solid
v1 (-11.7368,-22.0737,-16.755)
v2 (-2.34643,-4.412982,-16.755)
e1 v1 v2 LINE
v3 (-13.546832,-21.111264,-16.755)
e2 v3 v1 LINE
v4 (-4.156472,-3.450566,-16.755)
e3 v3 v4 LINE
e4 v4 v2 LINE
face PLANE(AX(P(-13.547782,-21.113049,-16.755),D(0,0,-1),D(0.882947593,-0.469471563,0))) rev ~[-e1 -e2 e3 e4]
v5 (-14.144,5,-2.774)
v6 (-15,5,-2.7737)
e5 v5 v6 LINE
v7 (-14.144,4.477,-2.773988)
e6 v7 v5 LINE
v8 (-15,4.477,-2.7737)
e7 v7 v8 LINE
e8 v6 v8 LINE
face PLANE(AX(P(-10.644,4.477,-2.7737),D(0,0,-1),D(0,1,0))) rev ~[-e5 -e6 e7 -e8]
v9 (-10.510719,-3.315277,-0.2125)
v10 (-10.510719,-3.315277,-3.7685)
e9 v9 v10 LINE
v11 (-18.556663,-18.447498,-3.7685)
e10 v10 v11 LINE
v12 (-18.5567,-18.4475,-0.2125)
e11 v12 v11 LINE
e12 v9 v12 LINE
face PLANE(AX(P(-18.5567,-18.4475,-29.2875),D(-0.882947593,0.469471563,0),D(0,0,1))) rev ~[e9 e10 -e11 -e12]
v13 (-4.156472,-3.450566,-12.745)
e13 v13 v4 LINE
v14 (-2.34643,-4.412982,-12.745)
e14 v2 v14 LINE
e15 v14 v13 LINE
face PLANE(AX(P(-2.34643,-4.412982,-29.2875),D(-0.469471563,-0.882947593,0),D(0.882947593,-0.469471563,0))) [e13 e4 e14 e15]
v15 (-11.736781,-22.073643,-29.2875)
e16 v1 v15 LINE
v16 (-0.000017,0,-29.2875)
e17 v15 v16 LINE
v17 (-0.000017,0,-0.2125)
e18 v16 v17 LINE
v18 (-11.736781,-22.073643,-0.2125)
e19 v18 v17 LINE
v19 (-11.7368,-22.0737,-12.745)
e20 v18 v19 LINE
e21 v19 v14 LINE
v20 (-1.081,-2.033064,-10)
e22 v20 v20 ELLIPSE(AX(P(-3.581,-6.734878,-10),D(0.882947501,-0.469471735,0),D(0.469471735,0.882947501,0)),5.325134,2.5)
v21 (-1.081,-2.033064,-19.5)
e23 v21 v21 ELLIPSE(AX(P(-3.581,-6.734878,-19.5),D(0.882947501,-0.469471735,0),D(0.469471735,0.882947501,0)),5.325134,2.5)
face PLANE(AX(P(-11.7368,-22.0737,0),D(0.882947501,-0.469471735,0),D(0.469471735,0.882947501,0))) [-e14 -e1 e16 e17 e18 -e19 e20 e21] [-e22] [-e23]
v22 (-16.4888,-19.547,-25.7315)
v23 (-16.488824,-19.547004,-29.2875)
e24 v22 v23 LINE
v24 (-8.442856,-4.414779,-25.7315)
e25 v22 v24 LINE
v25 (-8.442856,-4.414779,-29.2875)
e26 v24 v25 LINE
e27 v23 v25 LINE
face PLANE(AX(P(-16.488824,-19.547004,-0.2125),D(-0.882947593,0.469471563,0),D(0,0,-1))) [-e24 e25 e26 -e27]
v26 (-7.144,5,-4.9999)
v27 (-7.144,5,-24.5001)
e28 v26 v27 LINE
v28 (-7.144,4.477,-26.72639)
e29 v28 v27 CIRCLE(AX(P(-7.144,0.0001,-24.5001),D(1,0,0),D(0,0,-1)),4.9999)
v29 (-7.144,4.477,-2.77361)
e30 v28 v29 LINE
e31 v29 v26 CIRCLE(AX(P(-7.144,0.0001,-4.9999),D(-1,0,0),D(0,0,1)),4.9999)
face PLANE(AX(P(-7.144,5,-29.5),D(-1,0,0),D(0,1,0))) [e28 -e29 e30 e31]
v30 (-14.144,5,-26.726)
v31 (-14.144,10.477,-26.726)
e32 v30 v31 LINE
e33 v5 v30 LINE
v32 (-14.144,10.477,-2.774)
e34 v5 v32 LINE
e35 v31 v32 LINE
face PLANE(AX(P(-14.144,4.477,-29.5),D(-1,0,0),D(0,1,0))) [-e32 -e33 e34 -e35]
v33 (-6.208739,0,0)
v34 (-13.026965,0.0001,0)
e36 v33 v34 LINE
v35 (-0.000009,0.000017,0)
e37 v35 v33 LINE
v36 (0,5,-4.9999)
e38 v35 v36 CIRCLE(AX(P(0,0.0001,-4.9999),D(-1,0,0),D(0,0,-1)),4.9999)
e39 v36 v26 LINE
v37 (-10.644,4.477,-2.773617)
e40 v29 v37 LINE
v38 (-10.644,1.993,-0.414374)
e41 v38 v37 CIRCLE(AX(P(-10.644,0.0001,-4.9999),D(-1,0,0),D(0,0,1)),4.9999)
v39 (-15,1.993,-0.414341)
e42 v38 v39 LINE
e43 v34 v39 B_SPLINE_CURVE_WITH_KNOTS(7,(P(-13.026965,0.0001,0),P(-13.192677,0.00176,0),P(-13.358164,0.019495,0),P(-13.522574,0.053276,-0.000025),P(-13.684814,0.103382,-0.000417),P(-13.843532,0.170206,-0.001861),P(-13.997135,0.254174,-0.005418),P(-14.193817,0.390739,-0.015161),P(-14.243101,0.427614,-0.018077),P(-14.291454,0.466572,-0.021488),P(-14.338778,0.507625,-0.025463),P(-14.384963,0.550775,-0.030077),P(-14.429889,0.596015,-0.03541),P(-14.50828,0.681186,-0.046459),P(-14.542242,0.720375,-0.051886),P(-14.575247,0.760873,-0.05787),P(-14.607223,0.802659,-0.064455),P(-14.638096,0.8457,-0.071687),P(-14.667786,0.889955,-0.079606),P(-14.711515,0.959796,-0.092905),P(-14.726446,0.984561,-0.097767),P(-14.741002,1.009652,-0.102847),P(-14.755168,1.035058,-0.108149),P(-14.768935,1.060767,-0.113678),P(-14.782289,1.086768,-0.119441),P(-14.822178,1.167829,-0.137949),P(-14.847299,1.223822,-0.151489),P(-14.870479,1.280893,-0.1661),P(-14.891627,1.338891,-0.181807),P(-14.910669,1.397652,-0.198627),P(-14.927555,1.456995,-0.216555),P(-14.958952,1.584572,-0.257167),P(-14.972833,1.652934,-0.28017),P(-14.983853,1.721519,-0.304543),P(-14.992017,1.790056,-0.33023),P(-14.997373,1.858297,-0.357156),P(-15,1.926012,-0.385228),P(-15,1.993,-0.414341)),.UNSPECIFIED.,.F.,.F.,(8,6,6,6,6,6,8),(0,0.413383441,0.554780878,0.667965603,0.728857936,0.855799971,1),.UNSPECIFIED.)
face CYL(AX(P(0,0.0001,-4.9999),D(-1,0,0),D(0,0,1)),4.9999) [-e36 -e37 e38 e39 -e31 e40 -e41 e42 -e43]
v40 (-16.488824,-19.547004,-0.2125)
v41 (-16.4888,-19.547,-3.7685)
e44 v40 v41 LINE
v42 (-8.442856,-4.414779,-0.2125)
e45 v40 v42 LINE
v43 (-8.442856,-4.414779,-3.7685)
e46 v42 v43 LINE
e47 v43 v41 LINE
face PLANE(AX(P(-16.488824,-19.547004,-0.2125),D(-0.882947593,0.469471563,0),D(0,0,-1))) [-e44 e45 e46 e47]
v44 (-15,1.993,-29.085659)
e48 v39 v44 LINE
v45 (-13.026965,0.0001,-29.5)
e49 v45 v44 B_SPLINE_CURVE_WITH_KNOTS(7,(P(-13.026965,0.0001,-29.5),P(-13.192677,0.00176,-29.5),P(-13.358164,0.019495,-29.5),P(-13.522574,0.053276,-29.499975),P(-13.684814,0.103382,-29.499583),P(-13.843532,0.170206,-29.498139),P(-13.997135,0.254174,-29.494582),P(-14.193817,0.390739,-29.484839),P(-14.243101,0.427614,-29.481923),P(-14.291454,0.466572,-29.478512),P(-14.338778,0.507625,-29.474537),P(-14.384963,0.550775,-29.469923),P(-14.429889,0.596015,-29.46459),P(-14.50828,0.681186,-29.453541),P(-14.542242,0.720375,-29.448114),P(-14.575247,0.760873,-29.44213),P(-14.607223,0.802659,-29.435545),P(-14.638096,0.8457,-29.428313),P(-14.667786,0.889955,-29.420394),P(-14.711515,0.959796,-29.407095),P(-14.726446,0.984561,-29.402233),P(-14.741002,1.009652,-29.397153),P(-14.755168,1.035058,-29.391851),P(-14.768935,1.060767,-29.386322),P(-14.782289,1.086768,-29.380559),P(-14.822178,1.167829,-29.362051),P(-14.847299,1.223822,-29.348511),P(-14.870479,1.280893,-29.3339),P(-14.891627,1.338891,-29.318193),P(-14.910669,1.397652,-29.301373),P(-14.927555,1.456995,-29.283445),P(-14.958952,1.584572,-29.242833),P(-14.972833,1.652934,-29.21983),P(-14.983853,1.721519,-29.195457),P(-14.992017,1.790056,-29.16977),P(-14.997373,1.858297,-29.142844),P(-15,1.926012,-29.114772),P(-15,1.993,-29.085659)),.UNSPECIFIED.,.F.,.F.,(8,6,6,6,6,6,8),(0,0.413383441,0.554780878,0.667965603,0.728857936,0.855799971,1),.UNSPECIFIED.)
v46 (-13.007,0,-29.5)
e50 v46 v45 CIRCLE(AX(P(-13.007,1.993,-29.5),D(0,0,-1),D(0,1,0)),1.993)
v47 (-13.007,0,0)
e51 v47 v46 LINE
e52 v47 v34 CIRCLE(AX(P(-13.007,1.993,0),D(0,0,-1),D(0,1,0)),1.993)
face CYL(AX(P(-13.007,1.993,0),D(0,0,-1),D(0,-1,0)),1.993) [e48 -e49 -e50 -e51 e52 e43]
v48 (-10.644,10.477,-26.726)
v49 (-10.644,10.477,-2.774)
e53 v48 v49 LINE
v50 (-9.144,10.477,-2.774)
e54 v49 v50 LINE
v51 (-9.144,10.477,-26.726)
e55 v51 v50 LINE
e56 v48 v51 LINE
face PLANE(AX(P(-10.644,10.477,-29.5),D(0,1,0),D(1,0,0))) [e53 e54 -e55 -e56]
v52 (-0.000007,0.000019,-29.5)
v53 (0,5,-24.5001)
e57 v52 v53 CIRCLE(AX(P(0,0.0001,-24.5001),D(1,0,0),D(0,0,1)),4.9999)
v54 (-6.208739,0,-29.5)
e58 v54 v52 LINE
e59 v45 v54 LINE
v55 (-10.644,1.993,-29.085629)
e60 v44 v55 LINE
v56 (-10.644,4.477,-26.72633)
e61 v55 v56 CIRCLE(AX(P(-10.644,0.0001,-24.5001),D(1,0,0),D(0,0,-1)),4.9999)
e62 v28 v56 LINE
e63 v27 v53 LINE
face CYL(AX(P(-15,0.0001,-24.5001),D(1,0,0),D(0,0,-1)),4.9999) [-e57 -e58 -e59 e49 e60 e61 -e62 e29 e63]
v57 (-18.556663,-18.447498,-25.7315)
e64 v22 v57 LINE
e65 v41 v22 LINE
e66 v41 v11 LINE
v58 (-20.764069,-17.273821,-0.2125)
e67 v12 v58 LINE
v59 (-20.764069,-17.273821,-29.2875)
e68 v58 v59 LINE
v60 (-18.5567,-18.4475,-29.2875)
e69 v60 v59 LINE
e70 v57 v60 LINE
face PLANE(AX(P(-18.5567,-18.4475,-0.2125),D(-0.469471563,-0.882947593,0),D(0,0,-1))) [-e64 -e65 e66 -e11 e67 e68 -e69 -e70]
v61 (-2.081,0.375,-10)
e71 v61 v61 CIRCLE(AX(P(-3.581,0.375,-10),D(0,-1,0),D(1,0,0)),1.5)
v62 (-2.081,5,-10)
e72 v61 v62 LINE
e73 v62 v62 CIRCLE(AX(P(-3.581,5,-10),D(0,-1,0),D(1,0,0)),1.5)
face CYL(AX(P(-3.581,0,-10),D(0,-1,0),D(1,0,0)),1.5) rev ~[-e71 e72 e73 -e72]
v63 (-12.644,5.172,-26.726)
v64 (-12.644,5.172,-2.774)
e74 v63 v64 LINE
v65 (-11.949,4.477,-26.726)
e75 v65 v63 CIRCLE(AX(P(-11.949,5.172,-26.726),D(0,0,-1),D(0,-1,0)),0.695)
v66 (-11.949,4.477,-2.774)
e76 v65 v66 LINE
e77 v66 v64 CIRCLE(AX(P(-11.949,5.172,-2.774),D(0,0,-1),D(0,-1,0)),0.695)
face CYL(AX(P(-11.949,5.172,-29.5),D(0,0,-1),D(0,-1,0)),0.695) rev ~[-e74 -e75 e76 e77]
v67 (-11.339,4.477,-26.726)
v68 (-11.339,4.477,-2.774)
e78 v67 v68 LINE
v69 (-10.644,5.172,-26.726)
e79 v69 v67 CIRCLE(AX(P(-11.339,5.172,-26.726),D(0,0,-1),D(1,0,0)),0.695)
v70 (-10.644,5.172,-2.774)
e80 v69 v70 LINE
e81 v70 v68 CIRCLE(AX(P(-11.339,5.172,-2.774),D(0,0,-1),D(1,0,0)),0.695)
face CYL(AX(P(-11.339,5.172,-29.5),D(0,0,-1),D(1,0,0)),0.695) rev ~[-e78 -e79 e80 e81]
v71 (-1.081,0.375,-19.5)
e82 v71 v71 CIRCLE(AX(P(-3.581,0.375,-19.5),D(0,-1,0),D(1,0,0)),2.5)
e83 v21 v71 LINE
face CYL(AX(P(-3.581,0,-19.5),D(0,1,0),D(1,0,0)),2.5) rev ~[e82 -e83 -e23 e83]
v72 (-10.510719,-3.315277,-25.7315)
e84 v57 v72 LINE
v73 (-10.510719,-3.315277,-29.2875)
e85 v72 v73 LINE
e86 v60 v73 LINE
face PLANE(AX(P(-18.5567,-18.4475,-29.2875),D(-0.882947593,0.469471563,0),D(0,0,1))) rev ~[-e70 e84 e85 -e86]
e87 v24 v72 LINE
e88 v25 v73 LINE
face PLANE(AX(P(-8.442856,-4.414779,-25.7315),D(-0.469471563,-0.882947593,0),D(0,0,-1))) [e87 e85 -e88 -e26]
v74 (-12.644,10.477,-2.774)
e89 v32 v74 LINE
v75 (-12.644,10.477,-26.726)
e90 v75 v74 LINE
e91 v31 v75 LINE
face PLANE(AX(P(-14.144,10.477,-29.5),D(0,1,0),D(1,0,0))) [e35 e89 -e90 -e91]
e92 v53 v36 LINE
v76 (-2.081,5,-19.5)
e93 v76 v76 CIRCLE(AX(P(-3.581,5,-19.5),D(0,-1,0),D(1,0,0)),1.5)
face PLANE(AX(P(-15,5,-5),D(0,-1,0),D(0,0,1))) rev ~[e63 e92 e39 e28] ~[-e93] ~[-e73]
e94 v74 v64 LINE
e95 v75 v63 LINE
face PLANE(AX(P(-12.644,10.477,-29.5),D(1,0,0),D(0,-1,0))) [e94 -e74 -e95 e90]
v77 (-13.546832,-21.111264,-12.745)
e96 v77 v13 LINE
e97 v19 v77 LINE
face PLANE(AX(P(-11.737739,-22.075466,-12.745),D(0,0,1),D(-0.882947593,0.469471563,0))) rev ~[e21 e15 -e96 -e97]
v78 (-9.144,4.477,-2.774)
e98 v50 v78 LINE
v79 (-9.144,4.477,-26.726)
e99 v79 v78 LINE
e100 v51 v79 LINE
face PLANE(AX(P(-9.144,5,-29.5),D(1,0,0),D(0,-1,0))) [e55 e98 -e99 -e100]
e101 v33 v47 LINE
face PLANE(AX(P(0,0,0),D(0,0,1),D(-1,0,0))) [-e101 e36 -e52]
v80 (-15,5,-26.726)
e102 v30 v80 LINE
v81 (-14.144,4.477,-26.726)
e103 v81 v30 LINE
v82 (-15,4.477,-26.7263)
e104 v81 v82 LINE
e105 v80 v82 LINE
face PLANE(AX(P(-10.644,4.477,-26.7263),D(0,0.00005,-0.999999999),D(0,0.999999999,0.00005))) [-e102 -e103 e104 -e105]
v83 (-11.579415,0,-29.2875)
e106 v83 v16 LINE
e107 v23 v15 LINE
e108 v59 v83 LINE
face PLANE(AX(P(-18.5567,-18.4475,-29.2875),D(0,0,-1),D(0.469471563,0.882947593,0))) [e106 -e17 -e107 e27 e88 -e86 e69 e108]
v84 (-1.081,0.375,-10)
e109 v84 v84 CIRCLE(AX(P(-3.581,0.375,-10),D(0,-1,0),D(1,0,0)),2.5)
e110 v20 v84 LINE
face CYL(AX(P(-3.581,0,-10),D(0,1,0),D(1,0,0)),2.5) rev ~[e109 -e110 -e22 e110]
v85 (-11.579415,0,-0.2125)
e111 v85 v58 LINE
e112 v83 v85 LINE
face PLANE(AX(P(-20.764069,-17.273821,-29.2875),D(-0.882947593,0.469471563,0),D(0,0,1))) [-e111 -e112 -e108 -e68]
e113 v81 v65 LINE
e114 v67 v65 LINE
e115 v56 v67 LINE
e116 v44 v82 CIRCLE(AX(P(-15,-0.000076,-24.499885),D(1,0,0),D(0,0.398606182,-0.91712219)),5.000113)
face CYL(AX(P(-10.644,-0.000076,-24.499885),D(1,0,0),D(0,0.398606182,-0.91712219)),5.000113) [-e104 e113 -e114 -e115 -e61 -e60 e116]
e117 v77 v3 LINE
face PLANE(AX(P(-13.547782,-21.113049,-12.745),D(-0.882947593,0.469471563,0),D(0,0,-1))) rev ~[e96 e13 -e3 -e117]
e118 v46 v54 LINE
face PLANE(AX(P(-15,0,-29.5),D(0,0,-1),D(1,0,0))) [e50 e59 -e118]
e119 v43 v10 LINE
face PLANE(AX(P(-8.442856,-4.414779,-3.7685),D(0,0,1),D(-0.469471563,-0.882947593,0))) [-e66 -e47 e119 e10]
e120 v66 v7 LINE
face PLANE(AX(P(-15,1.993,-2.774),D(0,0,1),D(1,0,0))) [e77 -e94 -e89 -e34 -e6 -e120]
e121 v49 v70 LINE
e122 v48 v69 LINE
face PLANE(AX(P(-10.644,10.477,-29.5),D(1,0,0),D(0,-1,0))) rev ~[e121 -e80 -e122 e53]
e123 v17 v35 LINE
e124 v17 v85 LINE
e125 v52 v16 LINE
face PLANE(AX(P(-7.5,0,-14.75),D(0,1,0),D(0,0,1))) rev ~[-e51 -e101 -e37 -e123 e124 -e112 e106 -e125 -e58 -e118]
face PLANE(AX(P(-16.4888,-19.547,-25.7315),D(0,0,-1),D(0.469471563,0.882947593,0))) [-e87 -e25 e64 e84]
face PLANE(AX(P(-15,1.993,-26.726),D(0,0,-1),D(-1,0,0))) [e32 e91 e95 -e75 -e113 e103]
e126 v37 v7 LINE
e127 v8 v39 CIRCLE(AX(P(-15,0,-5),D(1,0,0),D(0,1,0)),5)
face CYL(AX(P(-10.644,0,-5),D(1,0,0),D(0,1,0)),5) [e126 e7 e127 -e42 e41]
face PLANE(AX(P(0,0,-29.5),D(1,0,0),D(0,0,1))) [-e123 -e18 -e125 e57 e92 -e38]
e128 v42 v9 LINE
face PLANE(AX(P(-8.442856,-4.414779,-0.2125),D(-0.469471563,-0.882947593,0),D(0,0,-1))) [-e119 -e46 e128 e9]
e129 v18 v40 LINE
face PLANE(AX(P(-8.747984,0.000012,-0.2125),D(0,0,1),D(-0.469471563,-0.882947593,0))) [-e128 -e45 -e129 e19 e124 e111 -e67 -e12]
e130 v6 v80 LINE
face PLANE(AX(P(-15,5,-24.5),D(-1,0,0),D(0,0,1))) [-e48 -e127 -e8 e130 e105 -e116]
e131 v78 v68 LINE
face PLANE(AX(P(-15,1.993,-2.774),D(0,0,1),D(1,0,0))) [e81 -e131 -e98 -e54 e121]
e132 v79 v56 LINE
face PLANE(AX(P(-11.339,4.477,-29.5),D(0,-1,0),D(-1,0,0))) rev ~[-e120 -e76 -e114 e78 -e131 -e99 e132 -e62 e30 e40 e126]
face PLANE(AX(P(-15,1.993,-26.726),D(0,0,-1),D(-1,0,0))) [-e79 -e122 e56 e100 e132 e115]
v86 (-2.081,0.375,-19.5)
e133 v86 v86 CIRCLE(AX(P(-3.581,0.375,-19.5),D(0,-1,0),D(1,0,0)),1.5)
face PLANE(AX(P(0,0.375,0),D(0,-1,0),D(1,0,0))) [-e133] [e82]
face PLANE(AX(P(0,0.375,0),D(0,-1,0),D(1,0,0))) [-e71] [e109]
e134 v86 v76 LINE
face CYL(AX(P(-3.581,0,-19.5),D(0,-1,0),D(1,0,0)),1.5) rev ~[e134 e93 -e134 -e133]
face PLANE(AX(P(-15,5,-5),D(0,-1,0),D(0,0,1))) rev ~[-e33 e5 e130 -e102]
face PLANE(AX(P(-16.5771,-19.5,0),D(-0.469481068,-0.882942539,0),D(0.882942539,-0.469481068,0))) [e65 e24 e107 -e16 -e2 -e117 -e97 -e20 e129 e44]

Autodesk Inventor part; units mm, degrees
ref_plane "YZ Plane" through (0, 0, 0) normal (1, 0, 0) x (0, 1, 0)
ref_plane "XZ Plane" through (0, 0, 0) normal (0, 1, 0) x (-1, 0, 0)
sketch "Sketch1" plane through (0, 0, 0) normal (0, 1, 0) x (-1, 0, 0)
  line L0 (0, 0) -> (15, 0)
  line L1 (15, 0) -> (15, -29.5)
  line L2 (15, -29.5) -> (0, -29.5)
  line L3 (0, -29.5) -> (0, 0)
  dimension "d0" = 15
  dimension "d1" = 29.5
extrude "Extrusion1" add sketch "Sketch1" along normal blind 5
fillet "Fillet1" radius 5 2 edges at (-7.5, 5, 0) (-7.5, 5, -29.5)
sketch "Sketch2" plane through (0, 0, 0) normal (0, -1, 0) x (1, 0, 0)
  circle A0 centre (-3.581, -10) radius 1.5
  line L0 (-15, -29.5) -> (-15, 0) projected
  line L1 (-15, -14.75) -> (-4.074, -14.75)
  line L2 (-4.074, 0) -> (-4.074, -29.5) projected
  circle A1 centre (-3.581, -19.5) radius 1.5
  line L3 (0, -27.3987) -> (0, -2.1013) projected
  point P0 (0, 0)
  dimension "d6" = 3
  dimension "d7" = 4.75
  dimension "d8" = 10.926
  dimension "d10" = 3
  dimension "d11" = 4.75
  dimension "d15" = 3.581
  dimension "d16" = 3.581
extrude "Extrusion2" cut sketch "Sketch2" against normal up to surface (5 mm away)
fillet "Fillet3" radius 1.993 1 edges at (-15, 0, -14.75)
sketch "Sketch3" plane through (0, 0, 0) normal (0, -1, 0) x (1, 0, 0)
  circle A0 centre (-3.581, -10) radius 2.5
  circle A1 centre (-3.581, -19.5) radius 2.5
  circle A2 centre (-3.581, -10) radius 1.5 projected
  circle A3 centre (-3.581, -19.5) radius 1.5 projected
  point P0 (0, 0)
  dimension "d18" = 5
  dimension "d19" = 5
  dimension "d20" = 0
  dimension "d21" = 0
  dimension "d22" = 0
  dimension "d23" = 0
extrude "Extrusion3" cut sketch "Sketch3" along normal blind 32.5 and the other way blind 0.375
sketch "Sketch4" plane through (-15, 5, -24.5) normal (-1, 0, 0) x (0, 0, 1)
  line L0 (24.5, -3.007) -> (-5, -3.007)
  line L1 (-5, -3.007) -> (-5, 0)
  line L2 (-5, 0) -> (24.5, 0)
  line L3 (24.5, 0) -> (24.5, -3.007)
  line L4 (-5, -5) -> (24.5, -5) projected
  line L5 (0, 0) -> (19.5, 0) projected
  dimension "d26" = 1.993
  dimension "d27" = 0
  dimension "d28" = 0
  dimension "d29" = 0
extrude "Extrusion4" add sketch "Sketch4" against normal blind 4.356
sketch "Sketch6" plane through (-15, 1.993, -29.5) normal (0, 0, -1) x (-1, 0, 0)
  line L0 (-3.661, 2.484) -> (-3.051, 2.484)
  line L1 (-0.856, 2.484) -> (-0.856, 8.484)
  line L2 (-0.856, 8.484) -> (-5.856, 8.484)
  line L3 (-5.856, 8.484) -> (-5.856, 2.484)
  line L4 (-15, -1.993) -> (-1.993, -1.993) projected
  line L5 (0, 3.007) -> (0, 0) projected
  line L6 (-15, -1.993) -> (-15, 3.007) projected
  line L7 (-4.356, 8.484) -> (-4.356, 3.179)
  line L8 (-2.356, 8.484) -> (-2.356, 3.179)
  arc A0 (-4.356, 3.179) -> (-3.661, 2.484) centre (-3.661, 3.179) ccw
  arc A1 (-3.051, 2.484) -> (-2.356, 3.179) centre (-3.051, 3.179) ccw
  line L9 (-0.856, 2.484) -> (-3.051, 2.484)
  line L10 (-5.856, 2.484) -> (-3.661, 2.484)
  line L11 (-5.856, 2.484) -> (-7.856, 2.484)
  line L12 (-15, 3.007) -> (-4.356, 3.007) projected
  line L13 (-5.856, 2.484) -> (-3.856, 2.484) construction
  line L14 (-7.856, 2.484) -> (-7.856, 8.484)
  line L15 (-7.856, 3.3104) -> (-5.856, 3.3104)
  point P0 (-10.926, -1.993)
  point P1 (-4.356, -1.993)
  dimension "d37" = 4.477
  dimension "d38" = 0.856
  dimension "d39" = 10.477
  dimension "d40" = 9.144
  dimension "d41" = 1.5
  dimension "d42" = 1.5
  dimension "d43" = 2
  dimension "d44" = 0.695
  dimension "d45" = 2
  dimension "d46" = 180
extrude "Extrusion6" cut sketch "Sketch6" against normal up to surface (29.5 mm away)
extrude "Extrusion7" add sketch "Sketch6" against normal up to surface (29.5 mm away) contours L10 L3 L2 L7 A0 | A1 L8 L2 L1 L9
extrude "Extrusion8" cut sketch "Sketch6" against normal blind 2.774 contours L10 L3 L2 L7 A0 | A1 L8 L2 L1 L9
sketch "Sketch7" plane through (-15, 1.993, 0) normal (0, 0, 1) x (1, 0, 0)
  line L0 (5.856, 8.484) -> (5.856, 2.484) projected
  line L1 (5.856, 2.484) -> (0.856, 2.484)
  line L2 (0.856, 2.484) -> (0.856, 11.6469)
  line L3 (0.856, 11.6469) -> (5.856, 11.6469)
  line L4 (5.856, 11.6469) -> (5.856, 2.484)
  line L5 (0.856, 3.007) -> (0.856, 8.484) projected
  point P0 (15, -1.993)
  dimension "d53" = 0
extrude "Extrusion9" cut sketch "Sketch7" against normal blind 2.774
sketch "Sketch8" plane through (-10.644, 5, -24.5) normal (1, 0, 0) x (0, 0, -1)
  arc A0 (4.5856, -3.007) -> (2.2263, -0.523) centre (0, -5) ccw projected
  arc A1 (4.5856, -3.007) -> (2.2263, -0.523) centre (0, -5) ccw
  line L0 (4.5856, -3.007) -> (5, -3.007) projected
  line L1 (4.5856, -3.007) -> (5, -3.007)
  line L2 (5, -3.007) -> (5, -0.523) projected
  line L3 (5, -3.007) -> (5, -0.523)
  line L4 (-24.5, 0) -> (5, 0) projected
  line L5 (5, -0.523) -> (5, 0)
  line L6 (5, 0) -> (2.226, 0)
  line L7 (2.226, -0.523) -> (2.226, 5.477) projected
  line L8 (2.226, -0.523) -> (2.226, 0)
  arc A2 (-19.5, 0) -> (-24.5, -5) centre (-19.5, -5) ccw projected
  line L9 (-24.0856, -3.007) -> (4.5856, -3.007) projected
  arc A3 (-21.7263, -0.523) -> (-24.0856, -3.007) centre (-19.5, -5) ccw
  line L10 (-24.5, -3.007) -> (-24.0856, -3.007) projected
  line L11 (-24.0856, -3.007) -> (-24.5, -3.007)
  line L12 (-24.5, -3.007) -> (-24.5, 0)
  line L13 (-24.5, 0) -> (-21.7263, 0)
  line L14 (2.2263, -0.523) -> (-21.7263, -0.523) projected
  line L15 (-21.7263, -0.523) -> (-21.7263, 0)
  line L16 (-21.726, 5.477) -> (-21.726, -0.523) projected
  point P0 (-22.3987, -0.926)
  point P1 (-24.0856, -3.007)
  point P2 (2.226, 0)
extrude "Extrusion10" cut sketch "Sketch8" against normal blind 9.726 contours A0 L7 L4 L5 L2 L0 | L10 L12 L4 L15 A2
ref_plane "Work Plane1" through (-11.25, 0, 0) normal (0, 0, 1) x (1, 0, 0)
sketch "Sketch9" plane through (-11.25, 0, 0) normal (0, 0, 1) x (1, 0, 0)
  line L0 (11.25, 0) -> (-1.757, 0) projected
  line L1 (11.25, 0) -> (17.6322, 0) construction
  line L2 (11.25, 0) -> (6.4097, 2.5736)
  line L3 (6.4097, 2.5736) -> (-5.3271, -19.5)
  line L4 (-5.3271, -19.5) -> (-0.4868, -22.0737)
  line L5 (-0.4868, -22.0737) -> (11.25, 0)
  line L6 (11.25, 0) -> (15.8244, 0)
  point P0 (5.0413, 0)
  dimension "d59" = 5.482
  dimension "d60" = 25
  dimension "d61" = 118
  dimension "d62" = 0
  dimension "d63" = 0
extrude "Extrusion11" add sketch "Sketch9" against normal blind 29.5 contours L5 L4 L3 L0
sketch "Sketch10" plane through (-16.5771, -19.5, -29.5) normal (-0.4694716, -0.8829476, 0) x (0.8829476, -0.4694716, 0)
  line L0 (5.482, 29.2875) -> (0, 29.2875)
  line L1 (0, 29.2875) -> (0, 0.2125)
  line L2 (0, 0.2125) -> (5.482, 0.2125)
  line L3 (5.482, 0.2125) -> (5.482, 29.2875)
  line L4 (5.482, 29.5) -> (5.482, 0) projected
  line L5 (0, 29.5) -> (0, 0) projected
  line L6 (5.482, 0) -> (0, 0) projected
  line L7 (0, 29.5) -> (5.482, 29.5) projected
  point P0 (5.482, 0.2125)
  point P1 (0, 0.2125)
  point P2 (0, 29.2875)
  point P3 (5.482, 29.2875)
  dimension "d66" = 0
  dimension "d67" = 0
  dimension "d68" = 0.2125
  dimension "d69" = 0.2125
  dimension "d70" = 29.075
extrude "Extrusion12" cut sketch "Sketch10" against normal up to surface contours L0 L5 L7 L4 | L4 L6 L5 L2 surface through (-7.5, 0, -14.75) normal (0, 1, 0)
sketch "Sketch11" plane through (-11.7368, -22.0737, -29.2875) normal (-0.4694716, -0.8829476, 0) x (0.8829476, -0.4694716, 0)
  line L0 (-5.482, 0) -> (-5.482, 29.075) projected
  line L1 (0, 0) -> (-5.482, 0) projected
  line L2 (-5.482, 29.075) -> (-5.382, 29.075)
  line L3 (-5.382, 29.075) -> (-5.382, 0)
  line L4 (-5.382, 0) -> (-5.482, 0)
  line L5 (-5.482, 0) -> (-5.482, 29.075)
  point P0 (0, 29.2875)
  dimension "d73" = 0.1
extrude "Extrusion13" cut sketch "Sketch11" against normal up to surface surface through (-7.5, 0, -14.75) normal (0, 1, 0)
sketch "Sketch12" plane through (-16.4888, -19.547, -29.2875) normal (-0.8829476, 0.4694716, 0) x (0, 0, 1)
  line L0 (25.519, 0) -> (3.556, 0)
  line L1 (3.556, 0) -> (3.556, 17.1383)
  line L2 (3.556, 17.1383) -> (25.519, 17.1383)
  line L3 (25.519, 17.1383) -> (25.519, 0)
  line L4 (29.075, 0) -> (0, 0) projected
  line L5 (0, 0) -> (0, 22.1383) projected
  line L6 (0, 22.1383) -> (29.075, 22.1383) projected
  line L7 (29.075, 22.1383) -> (29.075, 0) projected
  line L8 (29.075, 17.1383) -> (0, 17.1383)
  line L9 (0, 17.1383) -> (0, 22.1383)
  line L10 (0, 22.1383) -> (29.075, 22.1383)
  line L11 (29.075, 22.1383) -> (29.075, 17.1383)
  point P0 (29.2875, 25)
  point P1 (3.556, 17.1383)
  point P2 (25.519, 17.1383)
  dimension "d76" = 0
  dimension "d77" = 21.963
  dimension "d78" = 29.075
  dimension "d79" = 3.556
  dimension "d80" = 5
extrude "Extrusion14" add sketch "Sketch12" along normal blind 2.342 contours L0 L1 L2 L3 | L2 L8 L5 L6 L7
sketch "Sketch13" plane through (-18.5567, -18.4475, -29.2875) normal (-0.8829476, 0.4694716, 0) x (0, 0, 1)
  line L0 (0, 20.8931) -> (29.075, 20.8931) projected
  line L1 (29.075, 0) -> (0, 0)
  line L2 (0, 0) -> (0, 20.8931)
  line L3 (0, 20.8931) -> (29.075, 20.8931)
  line L4 (29.075, 20.8931) -> (29.075, 0)
  point P0 (29.2875, 25)
  point P1 (29.075, 20.8931)
extrude "Extrusion15" add sketch "Sketch13" along normal blind 2.5
sketch "Sketch14" plane through (-11.7368, -22.0737, -29.2875) normal (-0.4694716, -0.8829476, 0) x (0.8829476, -0.4694716, 0)
  line L0 (0, 16.5425) -> (-2.05, 16.5425)
  line L1 (-2.05, 16.5425) -> (-2.05, 12.5325)
  line L2 (-2.05, 12.5325) -> (0, 12.5325)
  line L3 (0, 12.5325) -> (0, 16.5425)
  line L4 (0, 29.075) -> (0, 0) projected
  line L5 (-5.382, 0) -> (0, 0) projected
  point P0 (0, 29.2875)
  dimension "d85" = 0
  dimension "d86" = 4.01
  dimension "d87" = 29.075
  dimension "d88" = 12.5325
  dimension "d89" = 2.05
extrude "Extrusion16" cut sketch "Sketch14" against normal blind 20
extrude "Extrusion17" cut sketch "Sketch3" along normal blind 32.5 contours A0 | A1 | A2 | A3
properties part number "bottomclip"
